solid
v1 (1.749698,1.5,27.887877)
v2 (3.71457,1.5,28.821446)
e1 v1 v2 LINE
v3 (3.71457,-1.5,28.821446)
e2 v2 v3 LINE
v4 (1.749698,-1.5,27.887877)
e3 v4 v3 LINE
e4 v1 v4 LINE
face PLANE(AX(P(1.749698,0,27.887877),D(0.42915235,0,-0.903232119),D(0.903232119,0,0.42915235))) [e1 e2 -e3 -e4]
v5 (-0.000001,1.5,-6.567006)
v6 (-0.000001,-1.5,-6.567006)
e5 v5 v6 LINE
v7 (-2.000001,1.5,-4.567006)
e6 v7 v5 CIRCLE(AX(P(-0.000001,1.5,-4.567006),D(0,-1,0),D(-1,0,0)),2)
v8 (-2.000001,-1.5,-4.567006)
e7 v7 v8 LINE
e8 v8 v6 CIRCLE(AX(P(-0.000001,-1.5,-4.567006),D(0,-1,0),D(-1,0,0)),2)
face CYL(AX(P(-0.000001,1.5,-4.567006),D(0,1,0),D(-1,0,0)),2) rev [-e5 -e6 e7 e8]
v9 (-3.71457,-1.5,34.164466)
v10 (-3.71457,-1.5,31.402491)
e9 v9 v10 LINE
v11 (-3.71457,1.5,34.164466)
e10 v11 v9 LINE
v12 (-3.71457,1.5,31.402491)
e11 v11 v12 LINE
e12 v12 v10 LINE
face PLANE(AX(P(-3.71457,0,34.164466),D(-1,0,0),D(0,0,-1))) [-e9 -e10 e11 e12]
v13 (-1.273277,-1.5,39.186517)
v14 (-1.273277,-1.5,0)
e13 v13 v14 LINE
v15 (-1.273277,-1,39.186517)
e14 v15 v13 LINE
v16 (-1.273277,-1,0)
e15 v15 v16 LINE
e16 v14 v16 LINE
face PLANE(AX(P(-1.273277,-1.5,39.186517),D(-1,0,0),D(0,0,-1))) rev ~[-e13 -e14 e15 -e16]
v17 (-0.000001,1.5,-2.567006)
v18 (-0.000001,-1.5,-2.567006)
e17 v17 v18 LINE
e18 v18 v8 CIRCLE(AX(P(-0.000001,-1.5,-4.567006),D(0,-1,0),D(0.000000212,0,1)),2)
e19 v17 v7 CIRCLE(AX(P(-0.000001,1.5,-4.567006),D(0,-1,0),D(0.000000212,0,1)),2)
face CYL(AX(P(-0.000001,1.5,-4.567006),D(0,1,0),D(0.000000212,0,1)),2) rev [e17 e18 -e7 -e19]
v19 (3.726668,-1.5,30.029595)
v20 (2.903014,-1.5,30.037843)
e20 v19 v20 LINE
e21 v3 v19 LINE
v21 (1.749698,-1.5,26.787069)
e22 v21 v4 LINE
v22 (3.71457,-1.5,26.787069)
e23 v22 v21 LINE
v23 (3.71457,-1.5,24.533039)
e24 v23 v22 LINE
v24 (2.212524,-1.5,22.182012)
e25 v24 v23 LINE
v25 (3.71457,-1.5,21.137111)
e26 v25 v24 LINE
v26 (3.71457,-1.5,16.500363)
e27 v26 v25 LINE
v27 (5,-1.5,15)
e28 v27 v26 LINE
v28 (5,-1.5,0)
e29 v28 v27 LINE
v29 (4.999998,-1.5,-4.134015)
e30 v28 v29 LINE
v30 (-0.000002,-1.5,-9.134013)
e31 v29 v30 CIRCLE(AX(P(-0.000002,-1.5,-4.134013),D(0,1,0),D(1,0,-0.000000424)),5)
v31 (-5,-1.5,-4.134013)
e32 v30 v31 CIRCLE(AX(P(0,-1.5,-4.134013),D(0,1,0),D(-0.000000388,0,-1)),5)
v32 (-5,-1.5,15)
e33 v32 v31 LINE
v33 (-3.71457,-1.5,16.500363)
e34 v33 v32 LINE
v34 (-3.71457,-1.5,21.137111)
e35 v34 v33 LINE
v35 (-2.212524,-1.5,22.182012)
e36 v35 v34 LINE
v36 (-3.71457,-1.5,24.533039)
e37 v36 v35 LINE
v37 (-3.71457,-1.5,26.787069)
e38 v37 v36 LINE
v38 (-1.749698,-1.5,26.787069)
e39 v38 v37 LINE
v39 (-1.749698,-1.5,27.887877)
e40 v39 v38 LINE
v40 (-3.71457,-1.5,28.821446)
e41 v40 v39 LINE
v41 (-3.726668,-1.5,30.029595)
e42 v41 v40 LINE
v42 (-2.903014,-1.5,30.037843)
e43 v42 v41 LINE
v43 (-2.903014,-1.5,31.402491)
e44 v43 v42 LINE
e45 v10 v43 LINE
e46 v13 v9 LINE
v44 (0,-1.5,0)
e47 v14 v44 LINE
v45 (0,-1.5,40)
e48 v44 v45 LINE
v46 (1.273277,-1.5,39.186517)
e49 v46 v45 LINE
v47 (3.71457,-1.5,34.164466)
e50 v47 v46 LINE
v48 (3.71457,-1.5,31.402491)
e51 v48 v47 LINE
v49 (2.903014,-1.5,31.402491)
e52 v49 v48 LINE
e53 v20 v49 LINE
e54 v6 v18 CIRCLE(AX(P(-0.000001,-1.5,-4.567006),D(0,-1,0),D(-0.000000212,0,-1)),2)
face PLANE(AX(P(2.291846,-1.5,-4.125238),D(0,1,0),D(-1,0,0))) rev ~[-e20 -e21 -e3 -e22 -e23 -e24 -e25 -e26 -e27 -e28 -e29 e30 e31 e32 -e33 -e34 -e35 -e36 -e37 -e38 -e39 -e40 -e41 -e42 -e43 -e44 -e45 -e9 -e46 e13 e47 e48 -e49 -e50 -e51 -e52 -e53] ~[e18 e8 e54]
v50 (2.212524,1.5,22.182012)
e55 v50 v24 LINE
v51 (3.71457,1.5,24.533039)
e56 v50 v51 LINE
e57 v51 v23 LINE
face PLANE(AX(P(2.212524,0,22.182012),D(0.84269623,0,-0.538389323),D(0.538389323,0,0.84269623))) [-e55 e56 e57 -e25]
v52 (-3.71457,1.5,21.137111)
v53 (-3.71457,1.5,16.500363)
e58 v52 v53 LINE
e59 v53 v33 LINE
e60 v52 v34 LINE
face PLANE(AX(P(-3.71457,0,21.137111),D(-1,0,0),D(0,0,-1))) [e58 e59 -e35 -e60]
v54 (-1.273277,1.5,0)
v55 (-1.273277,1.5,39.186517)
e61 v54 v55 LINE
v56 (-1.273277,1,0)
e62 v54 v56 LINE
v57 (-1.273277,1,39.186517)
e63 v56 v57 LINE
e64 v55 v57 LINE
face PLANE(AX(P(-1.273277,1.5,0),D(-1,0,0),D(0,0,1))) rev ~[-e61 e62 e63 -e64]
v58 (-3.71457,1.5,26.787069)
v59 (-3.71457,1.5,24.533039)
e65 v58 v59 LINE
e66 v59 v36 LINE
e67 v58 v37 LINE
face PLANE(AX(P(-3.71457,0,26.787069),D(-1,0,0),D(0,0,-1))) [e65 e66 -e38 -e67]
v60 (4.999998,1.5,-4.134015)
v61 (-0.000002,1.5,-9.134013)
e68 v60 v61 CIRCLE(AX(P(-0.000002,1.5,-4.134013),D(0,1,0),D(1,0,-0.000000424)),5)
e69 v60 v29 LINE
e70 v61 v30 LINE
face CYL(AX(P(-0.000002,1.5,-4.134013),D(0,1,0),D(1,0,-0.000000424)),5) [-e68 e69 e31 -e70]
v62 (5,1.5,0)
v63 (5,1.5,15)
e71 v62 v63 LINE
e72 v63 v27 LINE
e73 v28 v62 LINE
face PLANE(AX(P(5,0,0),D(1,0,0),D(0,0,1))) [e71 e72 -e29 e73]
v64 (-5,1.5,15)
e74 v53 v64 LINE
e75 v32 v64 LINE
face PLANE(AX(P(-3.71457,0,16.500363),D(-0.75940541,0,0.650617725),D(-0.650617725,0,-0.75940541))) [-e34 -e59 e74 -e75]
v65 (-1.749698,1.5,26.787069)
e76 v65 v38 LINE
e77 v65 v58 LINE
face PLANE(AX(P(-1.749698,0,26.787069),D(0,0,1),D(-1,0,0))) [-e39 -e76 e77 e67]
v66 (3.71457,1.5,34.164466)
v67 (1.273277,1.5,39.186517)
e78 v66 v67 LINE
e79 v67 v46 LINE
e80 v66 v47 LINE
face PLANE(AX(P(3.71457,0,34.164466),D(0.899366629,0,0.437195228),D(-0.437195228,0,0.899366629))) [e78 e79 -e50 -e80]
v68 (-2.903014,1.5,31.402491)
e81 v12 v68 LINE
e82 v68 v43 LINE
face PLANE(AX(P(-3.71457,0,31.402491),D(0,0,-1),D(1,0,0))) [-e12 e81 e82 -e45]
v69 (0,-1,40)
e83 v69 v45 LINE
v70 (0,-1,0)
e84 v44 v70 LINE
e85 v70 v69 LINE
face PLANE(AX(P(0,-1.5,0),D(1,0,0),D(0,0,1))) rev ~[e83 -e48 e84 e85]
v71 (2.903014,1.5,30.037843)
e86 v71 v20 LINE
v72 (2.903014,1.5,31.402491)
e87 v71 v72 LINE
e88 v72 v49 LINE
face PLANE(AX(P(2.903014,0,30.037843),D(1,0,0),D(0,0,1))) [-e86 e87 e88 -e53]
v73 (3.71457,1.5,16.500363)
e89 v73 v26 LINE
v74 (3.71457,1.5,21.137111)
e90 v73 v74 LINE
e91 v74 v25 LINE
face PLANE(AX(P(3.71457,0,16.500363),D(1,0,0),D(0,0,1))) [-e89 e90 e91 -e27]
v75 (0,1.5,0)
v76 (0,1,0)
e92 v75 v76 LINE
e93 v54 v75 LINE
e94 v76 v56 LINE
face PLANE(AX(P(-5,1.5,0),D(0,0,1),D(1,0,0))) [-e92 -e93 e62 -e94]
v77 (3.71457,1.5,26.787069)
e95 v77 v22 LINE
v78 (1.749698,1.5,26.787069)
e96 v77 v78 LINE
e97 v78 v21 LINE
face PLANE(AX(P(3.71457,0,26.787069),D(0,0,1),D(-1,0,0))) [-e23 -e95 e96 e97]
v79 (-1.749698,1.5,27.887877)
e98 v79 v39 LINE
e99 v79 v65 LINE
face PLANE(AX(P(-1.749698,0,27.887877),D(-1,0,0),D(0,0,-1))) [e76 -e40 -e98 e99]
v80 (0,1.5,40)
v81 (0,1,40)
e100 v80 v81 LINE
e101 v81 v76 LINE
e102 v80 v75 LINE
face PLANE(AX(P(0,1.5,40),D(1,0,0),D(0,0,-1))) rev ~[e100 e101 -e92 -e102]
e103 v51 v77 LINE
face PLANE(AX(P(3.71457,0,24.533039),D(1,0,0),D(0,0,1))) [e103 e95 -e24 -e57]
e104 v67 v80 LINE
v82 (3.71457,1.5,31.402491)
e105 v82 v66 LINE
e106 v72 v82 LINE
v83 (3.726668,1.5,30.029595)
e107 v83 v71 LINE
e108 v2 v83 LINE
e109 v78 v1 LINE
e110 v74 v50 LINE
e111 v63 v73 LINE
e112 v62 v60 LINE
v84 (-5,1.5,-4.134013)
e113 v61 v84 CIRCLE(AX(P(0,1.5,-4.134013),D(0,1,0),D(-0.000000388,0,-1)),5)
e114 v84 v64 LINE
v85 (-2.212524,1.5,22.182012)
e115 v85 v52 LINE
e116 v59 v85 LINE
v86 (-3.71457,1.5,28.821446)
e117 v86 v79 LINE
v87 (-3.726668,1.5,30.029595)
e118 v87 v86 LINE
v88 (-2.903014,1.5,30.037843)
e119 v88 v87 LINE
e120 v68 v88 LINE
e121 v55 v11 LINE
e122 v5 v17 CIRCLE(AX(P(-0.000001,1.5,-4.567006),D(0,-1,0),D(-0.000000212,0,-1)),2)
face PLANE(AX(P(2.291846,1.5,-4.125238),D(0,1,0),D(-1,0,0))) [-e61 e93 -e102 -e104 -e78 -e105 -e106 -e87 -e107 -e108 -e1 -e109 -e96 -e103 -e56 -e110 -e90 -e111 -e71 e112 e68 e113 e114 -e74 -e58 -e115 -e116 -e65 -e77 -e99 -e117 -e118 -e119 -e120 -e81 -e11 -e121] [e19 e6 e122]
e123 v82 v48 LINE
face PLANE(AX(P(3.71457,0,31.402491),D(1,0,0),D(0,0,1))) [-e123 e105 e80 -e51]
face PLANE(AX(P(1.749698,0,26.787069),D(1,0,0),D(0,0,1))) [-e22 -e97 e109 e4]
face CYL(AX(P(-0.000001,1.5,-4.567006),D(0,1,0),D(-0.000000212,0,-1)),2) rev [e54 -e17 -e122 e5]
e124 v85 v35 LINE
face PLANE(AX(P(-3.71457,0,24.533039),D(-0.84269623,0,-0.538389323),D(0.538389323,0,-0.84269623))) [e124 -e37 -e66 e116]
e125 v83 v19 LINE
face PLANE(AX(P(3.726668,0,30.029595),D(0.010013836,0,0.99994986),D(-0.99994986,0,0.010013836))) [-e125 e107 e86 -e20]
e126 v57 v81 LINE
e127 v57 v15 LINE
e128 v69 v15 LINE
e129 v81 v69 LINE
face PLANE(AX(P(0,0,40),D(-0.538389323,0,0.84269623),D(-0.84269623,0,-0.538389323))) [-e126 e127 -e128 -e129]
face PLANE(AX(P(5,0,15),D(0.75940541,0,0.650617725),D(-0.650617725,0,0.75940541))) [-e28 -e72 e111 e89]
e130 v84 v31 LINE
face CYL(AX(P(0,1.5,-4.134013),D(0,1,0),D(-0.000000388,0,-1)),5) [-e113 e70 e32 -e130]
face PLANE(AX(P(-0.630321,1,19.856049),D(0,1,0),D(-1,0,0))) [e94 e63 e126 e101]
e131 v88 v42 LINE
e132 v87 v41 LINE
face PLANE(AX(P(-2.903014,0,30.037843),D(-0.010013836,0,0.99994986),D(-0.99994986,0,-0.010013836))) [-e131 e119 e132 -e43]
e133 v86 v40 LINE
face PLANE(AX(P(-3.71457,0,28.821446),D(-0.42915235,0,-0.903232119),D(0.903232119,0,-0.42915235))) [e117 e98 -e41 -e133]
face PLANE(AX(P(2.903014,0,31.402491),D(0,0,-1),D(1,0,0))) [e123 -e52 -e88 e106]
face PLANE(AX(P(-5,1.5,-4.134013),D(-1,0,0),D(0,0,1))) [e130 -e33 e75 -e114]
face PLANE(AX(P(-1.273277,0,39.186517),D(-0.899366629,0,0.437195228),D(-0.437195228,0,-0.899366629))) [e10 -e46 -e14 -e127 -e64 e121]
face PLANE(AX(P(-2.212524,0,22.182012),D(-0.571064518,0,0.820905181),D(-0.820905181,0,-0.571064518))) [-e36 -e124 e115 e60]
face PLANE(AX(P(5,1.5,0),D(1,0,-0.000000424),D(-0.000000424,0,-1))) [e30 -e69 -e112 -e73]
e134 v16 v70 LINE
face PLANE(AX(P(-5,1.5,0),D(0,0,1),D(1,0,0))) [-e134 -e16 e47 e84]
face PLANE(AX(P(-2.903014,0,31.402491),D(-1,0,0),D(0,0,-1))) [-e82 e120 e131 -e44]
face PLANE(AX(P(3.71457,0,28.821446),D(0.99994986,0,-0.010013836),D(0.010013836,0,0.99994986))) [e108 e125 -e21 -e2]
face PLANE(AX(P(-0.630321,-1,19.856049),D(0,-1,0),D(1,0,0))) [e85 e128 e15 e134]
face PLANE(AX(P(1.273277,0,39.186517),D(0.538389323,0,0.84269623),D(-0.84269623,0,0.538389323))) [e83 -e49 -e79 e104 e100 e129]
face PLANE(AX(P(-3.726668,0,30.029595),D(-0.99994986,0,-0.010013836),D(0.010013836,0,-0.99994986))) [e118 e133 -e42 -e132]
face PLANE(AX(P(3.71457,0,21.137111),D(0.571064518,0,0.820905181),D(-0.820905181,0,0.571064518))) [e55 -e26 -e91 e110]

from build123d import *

# Parameters (mm, degrees)
F1_DEPTH = 1.5
F3_DEPTH = 0.5
F5_DEPTH = 0.5
F7_DEPTH = 3


# Not quite as in the source:
# - ends of sketch curves that miss each other by under 0.0002 mm in the source are joined
# - a feature names something its author has since deleted; it is built from what else it names


with BuildPart() as f1:
    # F0 (on Front) → F1 (new body, symmetric)
    with BuildSketch(Plane.XZ):
        Polygon((0, 40), (0, 0), (5, 0), (5, 15), (3.7145695426, 16.5003631264), (3.7145695426, 21.137110889), (2.2125243451, 22.1820119768), (3.7145695426, 24.5330389589), (3.7145695426, 26.7870686948), (1.7496975381, 26.7870686948), (1.7496975381, 27.8878770769), (3.7145695426, 28.8214460015), (3.7266683541, 30.0295948982), (2.903013601, 30.0378432554), (2.903013601, 31.4024910331), (3.7145695426, 31.4024910331), (3.7145695426, 34.1644659638), (1.2732772157, 39.1865172364), align=None)
        Polygon((-1.2732772157, 0), (0, 0), (0, 40), (-1.2732772157, 39.1865172364), align=None)
        Polygon((-5, 0), (-1.2732772157, 0), (-1.2732772157, 39.1865172364), (-3.7145695426, 34.1644659638), (-3.7145695426, 31.4024910331), (-2.903013601, 31.4024910331), (-2.903013601, 30.0378432554), (-3.7266683541, 30.0295948982), (-3.7145695426, 28.8214460015), (-1.7496975381, 27.8878770769), (-1.7496975381, 26.7870686948), (-3.7145695426, 26.7870686948), (-3.7145695426, 24.5330389589), (-2.2125243451, 22.1820119768), (-3.7145695426, 21.137110889), (-3.7145695426, 16.5003631264), (-5, 15), align=None)
    extrude(amount=F1_DEPTH, both=True)

    # F2 (on face) → F3 (cut)
    with BuildSketch(Plane.XZ.offset(1.5)):
        Polygon((0, 0), (0, 40), (-1.2732772157, 39.1865172364), (-1.2732772157, 0), align=None)
    extrude(amount=-F3_DEPTH, mode=Mode.SUBTRACT)

    # F4 (on face) → F5 (cut)
    with BuildSketch(Plane(origin=(0, 1.5, 0), x_dir=(-1, 0, 0), z_dir=(0, 1, 0))):
        Polygon((1.2732772157, 0), (1.2732772157, 39.1865172364), (0, 40), (0, 0), align=None)
    extrude(amount=-F5_DEPTH, mode=Mode.SUBTRACT)

    # F6 (on face) → F7 (join)
    with BuildSketch(Plane(origin=(0, 1.5, 0), x_dir=(-1, 0, 0), z_dir=(0, 1, 0))):
        with BuildLine():
            Line((-5, 0), (-4.9999982459, -4.1340150831))
            ThreePointArc((-4.9999982459, -4.1340150831), (-3.5355314017, -7.6695476176), (1.7541e-06, -9.1340129616))
            Line((1.7541e-06, -9.1340129616), (1.3932e-06, -6.5670064808))
            ThreePointArc((1.3932e-06, -6.5670064808), (-1.9999990311, -4.5670062085), (5.446e-07, -2.5670064808))
            Line((5.446e-07, -2.5670064808), (0, 0))
            Line((0, 0), (-5, 0))
        make_face()
        with BuildLine():
            Line((1.3932e-06, -6.5670064808), (1.9378e-06, -9.1340129616))
            ThreePointArc((1.9378e-06, -9.1340129616), (3.5355339059, -7.6695468675), (5, -4.1340129616))
            Line((5, -4.1340129616), (5, 0))
            Line((5, 0), (0, 0))
            Line((0, 0), (5.446e-07, -2.5670064808))
            ThreePointArc((5.446e-07, -2.5670064808), (1.4142143813, -3.1527927684), (2.0000009689, -4.5670064808))
            ThreePointArc((2.0000009689, -4.5670064808), (1.4142141887, -5.9812203857), (1.3932e-06, -6.5670064808))
        make_face()
    extrude(amount=-F7_DEPTH)


solid = f1.part
